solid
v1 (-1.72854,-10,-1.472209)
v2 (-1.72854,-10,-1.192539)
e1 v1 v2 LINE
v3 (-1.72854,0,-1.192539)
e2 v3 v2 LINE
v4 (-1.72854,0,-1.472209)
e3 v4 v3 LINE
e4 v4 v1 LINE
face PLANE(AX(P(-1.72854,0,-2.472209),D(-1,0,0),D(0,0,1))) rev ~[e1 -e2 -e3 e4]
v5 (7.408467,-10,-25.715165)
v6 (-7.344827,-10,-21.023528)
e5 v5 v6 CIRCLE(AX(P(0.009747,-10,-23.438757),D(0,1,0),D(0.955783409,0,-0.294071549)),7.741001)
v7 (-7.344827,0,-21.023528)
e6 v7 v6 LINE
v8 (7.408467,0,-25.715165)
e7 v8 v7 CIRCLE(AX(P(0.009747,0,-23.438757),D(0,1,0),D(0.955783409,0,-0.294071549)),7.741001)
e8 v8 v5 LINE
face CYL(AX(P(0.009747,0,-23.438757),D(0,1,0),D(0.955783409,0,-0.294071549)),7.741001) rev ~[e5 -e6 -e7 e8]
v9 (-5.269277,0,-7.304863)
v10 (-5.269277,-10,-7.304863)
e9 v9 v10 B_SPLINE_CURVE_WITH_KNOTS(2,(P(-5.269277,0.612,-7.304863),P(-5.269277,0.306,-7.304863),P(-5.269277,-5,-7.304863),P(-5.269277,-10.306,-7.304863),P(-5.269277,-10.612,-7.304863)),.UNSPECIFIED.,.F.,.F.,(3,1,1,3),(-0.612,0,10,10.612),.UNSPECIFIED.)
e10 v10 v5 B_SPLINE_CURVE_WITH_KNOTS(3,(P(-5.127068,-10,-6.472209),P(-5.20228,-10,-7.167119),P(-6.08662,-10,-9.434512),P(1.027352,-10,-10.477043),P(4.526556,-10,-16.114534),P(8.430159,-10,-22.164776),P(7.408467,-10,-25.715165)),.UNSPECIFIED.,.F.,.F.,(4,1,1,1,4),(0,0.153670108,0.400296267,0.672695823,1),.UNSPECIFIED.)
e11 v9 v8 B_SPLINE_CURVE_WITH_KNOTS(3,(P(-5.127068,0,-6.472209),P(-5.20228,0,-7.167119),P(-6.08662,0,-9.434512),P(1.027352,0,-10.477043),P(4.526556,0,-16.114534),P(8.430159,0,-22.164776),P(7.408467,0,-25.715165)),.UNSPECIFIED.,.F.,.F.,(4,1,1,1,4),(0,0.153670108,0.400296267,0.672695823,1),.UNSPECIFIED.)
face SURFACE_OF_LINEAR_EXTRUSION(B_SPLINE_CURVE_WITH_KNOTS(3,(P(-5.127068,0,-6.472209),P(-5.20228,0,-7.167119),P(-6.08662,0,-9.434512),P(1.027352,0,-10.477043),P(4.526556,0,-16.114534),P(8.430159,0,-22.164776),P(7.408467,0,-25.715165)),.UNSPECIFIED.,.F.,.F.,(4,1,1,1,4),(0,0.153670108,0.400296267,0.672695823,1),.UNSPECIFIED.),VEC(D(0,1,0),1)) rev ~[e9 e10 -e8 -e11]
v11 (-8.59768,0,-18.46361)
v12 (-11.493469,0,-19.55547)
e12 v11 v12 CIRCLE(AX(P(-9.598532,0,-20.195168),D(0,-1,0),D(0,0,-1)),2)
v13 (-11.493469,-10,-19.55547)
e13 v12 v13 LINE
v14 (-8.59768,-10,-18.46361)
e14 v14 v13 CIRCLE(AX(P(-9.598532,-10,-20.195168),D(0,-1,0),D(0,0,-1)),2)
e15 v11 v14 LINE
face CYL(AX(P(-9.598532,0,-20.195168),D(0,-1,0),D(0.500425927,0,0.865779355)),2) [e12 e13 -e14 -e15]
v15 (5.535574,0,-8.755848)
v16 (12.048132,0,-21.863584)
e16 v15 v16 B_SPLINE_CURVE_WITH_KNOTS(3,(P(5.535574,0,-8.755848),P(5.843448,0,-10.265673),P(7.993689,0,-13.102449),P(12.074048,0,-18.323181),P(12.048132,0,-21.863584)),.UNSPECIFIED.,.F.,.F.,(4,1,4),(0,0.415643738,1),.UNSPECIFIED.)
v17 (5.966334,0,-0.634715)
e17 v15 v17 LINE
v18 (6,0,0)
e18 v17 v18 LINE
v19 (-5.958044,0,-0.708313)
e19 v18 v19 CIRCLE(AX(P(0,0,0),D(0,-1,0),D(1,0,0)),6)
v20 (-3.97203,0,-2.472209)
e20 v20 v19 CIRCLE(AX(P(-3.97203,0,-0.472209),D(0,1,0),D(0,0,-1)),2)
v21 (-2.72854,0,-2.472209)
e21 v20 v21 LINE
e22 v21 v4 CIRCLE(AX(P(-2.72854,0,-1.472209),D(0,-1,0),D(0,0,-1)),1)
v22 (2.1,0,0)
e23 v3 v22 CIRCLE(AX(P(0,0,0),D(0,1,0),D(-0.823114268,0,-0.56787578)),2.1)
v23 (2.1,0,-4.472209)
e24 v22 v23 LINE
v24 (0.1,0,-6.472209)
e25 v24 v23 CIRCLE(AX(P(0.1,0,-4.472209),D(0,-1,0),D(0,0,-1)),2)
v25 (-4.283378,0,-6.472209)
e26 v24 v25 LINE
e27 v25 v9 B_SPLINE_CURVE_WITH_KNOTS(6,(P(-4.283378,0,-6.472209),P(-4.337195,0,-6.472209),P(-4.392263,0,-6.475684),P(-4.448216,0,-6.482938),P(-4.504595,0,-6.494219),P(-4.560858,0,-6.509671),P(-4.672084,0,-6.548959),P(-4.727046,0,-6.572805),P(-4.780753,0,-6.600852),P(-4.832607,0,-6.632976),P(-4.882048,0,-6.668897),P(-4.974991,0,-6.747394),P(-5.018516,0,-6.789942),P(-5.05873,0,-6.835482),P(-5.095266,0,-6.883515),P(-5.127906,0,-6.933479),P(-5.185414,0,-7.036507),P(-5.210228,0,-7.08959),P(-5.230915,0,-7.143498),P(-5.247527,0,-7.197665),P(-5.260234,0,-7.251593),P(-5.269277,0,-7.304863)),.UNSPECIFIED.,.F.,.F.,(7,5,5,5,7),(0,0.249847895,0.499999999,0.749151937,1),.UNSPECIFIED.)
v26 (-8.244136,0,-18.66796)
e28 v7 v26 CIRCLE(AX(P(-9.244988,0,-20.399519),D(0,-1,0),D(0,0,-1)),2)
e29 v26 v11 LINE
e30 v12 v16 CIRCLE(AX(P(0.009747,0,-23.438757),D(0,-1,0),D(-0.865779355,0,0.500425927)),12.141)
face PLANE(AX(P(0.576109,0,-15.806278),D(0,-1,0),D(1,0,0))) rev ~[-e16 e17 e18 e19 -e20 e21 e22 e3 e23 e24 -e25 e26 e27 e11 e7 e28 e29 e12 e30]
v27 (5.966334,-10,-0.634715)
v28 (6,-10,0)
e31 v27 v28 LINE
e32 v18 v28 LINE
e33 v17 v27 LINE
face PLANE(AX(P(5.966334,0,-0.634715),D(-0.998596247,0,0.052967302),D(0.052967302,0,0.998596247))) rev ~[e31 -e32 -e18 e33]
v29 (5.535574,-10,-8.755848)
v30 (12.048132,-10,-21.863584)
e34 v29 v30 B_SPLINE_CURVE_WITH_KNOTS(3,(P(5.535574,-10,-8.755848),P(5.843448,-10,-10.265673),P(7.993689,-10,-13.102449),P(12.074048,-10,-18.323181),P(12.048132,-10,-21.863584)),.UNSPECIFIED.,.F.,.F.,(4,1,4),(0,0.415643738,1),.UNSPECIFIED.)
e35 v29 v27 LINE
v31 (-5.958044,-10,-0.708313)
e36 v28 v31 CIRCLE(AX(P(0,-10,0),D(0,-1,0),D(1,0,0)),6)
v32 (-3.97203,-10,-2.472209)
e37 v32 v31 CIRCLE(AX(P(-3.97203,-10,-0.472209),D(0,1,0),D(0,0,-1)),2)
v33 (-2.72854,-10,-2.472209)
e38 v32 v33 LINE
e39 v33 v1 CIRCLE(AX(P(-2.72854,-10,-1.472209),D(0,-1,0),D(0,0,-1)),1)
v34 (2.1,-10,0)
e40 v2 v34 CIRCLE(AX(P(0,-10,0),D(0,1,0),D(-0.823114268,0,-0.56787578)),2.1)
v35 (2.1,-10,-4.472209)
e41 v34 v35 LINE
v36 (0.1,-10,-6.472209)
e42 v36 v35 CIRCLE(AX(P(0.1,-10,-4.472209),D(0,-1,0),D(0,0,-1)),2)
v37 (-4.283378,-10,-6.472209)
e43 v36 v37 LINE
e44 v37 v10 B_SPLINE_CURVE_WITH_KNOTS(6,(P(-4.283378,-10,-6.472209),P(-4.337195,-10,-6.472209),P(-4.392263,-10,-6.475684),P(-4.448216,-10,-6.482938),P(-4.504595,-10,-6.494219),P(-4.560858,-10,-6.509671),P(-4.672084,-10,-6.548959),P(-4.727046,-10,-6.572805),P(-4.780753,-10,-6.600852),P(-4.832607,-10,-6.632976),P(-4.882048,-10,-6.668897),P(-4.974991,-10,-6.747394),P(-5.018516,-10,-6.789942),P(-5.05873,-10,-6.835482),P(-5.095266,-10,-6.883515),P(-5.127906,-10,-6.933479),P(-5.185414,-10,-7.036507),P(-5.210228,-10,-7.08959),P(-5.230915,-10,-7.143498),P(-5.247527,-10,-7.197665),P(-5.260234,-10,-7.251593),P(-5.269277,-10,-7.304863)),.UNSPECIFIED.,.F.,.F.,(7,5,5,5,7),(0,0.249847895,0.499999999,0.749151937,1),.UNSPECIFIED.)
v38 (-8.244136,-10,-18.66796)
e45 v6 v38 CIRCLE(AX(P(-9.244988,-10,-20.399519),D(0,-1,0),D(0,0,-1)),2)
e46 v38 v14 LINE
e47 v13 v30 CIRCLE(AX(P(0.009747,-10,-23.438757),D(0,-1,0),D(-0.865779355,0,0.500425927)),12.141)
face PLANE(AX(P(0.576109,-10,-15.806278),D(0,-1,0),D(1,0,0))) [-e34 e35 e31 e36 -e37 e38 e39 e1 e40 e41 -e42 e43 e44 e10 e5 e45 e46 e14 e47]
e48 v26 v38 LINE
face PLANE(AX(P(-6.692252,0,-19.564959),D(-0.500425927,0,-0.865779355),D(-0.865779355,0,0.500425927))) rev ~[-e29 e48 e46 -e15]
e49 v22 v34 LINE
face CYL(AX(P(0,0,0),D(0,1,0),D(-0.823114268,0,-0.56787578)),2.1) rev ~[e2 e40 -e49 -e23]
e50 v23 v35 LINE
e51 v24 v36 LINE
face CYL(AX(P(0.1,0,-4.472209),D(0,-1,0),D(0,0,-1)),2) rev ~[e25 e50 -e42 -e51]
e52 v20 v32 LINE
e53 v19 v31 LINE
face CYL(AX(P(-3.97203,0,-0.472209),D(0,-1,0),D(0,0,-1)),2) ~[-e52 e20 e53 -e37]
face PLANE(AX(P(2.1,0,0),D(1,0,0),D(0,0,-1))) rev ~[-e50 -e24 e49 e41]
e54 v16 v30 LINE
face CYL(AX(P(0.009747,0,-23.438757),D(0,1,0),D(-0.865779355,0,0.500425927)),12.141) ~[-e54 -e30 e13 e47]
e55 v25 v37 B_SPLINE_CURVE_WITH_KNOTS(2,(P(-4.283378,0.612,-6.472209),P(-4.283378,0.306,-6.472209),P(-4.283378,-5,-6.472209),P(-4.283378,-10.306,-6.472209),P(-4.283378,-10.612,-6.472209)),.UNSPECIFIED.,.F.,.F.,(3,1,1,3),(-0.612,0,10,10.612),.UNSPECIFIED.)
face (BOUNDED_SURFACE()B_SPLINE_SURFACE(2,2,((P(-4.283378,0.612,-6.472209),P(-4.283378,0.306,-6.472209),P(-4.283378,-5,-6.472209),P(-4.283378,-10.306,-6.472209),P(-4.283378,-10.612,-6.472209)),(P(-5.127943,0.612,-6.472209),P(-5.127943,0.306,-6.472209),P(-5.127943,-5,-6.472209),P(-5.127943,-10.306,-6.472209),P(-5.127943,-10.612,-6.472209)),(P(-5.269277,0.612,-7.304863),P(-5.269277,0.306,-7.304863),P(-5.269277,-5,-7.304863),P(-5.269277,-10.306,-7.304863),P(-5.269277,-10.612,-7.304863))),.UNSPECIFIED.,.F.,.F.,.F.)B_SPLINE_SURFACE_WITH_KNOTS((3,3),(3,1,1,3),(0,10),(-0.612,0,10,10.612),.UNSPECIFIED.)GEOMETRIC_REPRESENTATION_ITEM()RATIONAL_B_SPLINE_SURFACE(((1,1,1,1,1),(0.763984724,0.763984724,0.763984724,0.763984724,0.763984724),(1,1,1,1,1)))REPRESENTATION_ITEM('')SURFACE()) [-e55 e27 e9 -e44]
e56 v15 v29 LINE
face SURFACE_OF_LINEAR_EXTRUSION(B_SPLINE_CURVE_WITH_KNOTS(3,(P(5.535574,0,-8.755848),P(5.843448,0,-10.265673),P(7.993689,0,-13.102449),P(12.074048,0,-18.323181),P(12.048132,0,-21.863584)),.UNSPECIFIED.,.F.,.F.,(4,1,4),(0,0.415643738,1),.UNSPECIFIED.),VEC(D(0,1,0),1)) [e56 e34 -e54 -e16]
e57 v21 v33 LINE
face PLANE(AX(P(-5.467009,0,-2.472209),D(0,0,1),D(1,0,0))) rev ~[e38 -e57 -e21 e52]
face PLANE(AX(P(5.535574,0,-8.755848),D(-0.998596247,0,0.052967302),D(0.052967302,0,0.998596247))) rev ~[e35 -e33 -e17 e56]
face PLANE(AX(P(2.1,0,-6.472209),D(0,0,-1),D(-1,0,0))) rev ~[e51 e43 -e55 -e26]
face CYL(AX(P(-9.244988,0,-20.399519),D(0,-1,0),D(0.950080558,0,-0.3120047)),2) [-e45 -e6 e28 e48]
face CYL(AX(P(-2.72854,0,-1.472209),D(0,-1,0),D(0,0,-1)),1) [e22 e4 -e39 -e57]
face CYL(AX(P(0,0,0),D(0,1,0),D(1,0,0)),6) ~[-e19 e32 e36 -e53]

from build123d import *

# Parameters (mm, degrees)
F1_DEPTH = 10
F2_R     = 1
F3_R     = 2


# Not quite as in the source:
# - two fillets or chamfers of one size are made in one step
# - a feature names something its author has since deleted; it is built from what else it names


with BuildPart() as f1:
    # F0 (on Front) → F1 (new body)
    with BuildSketch(Plane.XZ):
        with BuildLine():
            ThreePointArc((-1.7285399627, -1.1925391387), (-0.6245262518, 2.0049855263), (2.1, 0))
            Line((2.1, 0), (2.1, -6.4722087772))
            Line((2.1, -6.4722087772), (-1.7285399627, -6.4722087772))
            Line((-1.7285399627, -6.4722087772), (-5.1270676777, -6.4722087772))
            add(Edge.make_bspline(
                [(-5.1270676777, -6.4722087772), (-5.2022797508, -7.1671189286), (-6.0866195882, -9.4345123751), (1.027351741, -10.4770430063), (4.526556097, -16.11453384), (8.4301587847, -22.1647756383), (7.4084669429, -25.7151645559)],
                knots=[0, 0, 0, 0, 0.1536701078, 0.4002962667, 0.6726958228, 1, 1, 1, 1], degree=3))
            ThreePointArc((7.4084669429, -25.7151645559), (-3.085024735, -30.5342112997), (-6.6922515438, -19.5649590981))
            Line((-6.6922515438, -19.5649590981), (-10.5016801666, -17.3630853307))
            ThreePointArc((-10.5016801666, -17.3630853307), (-2.3664943525, -35.3449464187), (12.0481319901, -21.8635843278))
            add(Edge.make_bspline(
                [(5.535574435, -8.7558477202), (5.8434484166, -10.2656725536), (7.9936891439, -13.1024488577), (12.074048333, -18.3231807373), (12.0481319901, -21.8635843278)],
                knots=[0, 0, 0, 0, 0.4156437378, 1, 1, 1, 1], degree=3))
            Line((5.535574435, -8.7558477202), (5.9663335796, -0.6347153824))
            Line((5.9663335796, -0.6347153824), (6, 0))
            ThreePointArc((6, 0), (-1.2645054368, 5.8652387846), (-5.4670086667, -2.4722087772))
            Line((-5.4670086667, -2.4722087772), (-1.7285399627, -2.4722087772))
            Line((-1.7285399627, -2.4722087772), (-1.7285399627, -1.1925391387))
        make_face()
    extrude(amount=F1_DEPTH)

    # F2
    f2_edges = [f1.edges().sort_by_distance(p)[0] for p in [
        (-1.72854, -5, -2.472209),
        (-5.127068, -5, -6.472209),
    ]]
    fillet(f2_edges, radius=F2_R)

    # F3
    f3_edges = [f1.edges().sort_by_distance(p)[0] for p in [
        (-10.50168, -5, -17.363085),
        (-6.692252, -5, -19.564959),
        (-5.467009, -5, -2.472209),
        (2.1, -5, -6.472209),
    ]]
    fillet(f3_edges, radius=F3_R)


solid = f1.part
